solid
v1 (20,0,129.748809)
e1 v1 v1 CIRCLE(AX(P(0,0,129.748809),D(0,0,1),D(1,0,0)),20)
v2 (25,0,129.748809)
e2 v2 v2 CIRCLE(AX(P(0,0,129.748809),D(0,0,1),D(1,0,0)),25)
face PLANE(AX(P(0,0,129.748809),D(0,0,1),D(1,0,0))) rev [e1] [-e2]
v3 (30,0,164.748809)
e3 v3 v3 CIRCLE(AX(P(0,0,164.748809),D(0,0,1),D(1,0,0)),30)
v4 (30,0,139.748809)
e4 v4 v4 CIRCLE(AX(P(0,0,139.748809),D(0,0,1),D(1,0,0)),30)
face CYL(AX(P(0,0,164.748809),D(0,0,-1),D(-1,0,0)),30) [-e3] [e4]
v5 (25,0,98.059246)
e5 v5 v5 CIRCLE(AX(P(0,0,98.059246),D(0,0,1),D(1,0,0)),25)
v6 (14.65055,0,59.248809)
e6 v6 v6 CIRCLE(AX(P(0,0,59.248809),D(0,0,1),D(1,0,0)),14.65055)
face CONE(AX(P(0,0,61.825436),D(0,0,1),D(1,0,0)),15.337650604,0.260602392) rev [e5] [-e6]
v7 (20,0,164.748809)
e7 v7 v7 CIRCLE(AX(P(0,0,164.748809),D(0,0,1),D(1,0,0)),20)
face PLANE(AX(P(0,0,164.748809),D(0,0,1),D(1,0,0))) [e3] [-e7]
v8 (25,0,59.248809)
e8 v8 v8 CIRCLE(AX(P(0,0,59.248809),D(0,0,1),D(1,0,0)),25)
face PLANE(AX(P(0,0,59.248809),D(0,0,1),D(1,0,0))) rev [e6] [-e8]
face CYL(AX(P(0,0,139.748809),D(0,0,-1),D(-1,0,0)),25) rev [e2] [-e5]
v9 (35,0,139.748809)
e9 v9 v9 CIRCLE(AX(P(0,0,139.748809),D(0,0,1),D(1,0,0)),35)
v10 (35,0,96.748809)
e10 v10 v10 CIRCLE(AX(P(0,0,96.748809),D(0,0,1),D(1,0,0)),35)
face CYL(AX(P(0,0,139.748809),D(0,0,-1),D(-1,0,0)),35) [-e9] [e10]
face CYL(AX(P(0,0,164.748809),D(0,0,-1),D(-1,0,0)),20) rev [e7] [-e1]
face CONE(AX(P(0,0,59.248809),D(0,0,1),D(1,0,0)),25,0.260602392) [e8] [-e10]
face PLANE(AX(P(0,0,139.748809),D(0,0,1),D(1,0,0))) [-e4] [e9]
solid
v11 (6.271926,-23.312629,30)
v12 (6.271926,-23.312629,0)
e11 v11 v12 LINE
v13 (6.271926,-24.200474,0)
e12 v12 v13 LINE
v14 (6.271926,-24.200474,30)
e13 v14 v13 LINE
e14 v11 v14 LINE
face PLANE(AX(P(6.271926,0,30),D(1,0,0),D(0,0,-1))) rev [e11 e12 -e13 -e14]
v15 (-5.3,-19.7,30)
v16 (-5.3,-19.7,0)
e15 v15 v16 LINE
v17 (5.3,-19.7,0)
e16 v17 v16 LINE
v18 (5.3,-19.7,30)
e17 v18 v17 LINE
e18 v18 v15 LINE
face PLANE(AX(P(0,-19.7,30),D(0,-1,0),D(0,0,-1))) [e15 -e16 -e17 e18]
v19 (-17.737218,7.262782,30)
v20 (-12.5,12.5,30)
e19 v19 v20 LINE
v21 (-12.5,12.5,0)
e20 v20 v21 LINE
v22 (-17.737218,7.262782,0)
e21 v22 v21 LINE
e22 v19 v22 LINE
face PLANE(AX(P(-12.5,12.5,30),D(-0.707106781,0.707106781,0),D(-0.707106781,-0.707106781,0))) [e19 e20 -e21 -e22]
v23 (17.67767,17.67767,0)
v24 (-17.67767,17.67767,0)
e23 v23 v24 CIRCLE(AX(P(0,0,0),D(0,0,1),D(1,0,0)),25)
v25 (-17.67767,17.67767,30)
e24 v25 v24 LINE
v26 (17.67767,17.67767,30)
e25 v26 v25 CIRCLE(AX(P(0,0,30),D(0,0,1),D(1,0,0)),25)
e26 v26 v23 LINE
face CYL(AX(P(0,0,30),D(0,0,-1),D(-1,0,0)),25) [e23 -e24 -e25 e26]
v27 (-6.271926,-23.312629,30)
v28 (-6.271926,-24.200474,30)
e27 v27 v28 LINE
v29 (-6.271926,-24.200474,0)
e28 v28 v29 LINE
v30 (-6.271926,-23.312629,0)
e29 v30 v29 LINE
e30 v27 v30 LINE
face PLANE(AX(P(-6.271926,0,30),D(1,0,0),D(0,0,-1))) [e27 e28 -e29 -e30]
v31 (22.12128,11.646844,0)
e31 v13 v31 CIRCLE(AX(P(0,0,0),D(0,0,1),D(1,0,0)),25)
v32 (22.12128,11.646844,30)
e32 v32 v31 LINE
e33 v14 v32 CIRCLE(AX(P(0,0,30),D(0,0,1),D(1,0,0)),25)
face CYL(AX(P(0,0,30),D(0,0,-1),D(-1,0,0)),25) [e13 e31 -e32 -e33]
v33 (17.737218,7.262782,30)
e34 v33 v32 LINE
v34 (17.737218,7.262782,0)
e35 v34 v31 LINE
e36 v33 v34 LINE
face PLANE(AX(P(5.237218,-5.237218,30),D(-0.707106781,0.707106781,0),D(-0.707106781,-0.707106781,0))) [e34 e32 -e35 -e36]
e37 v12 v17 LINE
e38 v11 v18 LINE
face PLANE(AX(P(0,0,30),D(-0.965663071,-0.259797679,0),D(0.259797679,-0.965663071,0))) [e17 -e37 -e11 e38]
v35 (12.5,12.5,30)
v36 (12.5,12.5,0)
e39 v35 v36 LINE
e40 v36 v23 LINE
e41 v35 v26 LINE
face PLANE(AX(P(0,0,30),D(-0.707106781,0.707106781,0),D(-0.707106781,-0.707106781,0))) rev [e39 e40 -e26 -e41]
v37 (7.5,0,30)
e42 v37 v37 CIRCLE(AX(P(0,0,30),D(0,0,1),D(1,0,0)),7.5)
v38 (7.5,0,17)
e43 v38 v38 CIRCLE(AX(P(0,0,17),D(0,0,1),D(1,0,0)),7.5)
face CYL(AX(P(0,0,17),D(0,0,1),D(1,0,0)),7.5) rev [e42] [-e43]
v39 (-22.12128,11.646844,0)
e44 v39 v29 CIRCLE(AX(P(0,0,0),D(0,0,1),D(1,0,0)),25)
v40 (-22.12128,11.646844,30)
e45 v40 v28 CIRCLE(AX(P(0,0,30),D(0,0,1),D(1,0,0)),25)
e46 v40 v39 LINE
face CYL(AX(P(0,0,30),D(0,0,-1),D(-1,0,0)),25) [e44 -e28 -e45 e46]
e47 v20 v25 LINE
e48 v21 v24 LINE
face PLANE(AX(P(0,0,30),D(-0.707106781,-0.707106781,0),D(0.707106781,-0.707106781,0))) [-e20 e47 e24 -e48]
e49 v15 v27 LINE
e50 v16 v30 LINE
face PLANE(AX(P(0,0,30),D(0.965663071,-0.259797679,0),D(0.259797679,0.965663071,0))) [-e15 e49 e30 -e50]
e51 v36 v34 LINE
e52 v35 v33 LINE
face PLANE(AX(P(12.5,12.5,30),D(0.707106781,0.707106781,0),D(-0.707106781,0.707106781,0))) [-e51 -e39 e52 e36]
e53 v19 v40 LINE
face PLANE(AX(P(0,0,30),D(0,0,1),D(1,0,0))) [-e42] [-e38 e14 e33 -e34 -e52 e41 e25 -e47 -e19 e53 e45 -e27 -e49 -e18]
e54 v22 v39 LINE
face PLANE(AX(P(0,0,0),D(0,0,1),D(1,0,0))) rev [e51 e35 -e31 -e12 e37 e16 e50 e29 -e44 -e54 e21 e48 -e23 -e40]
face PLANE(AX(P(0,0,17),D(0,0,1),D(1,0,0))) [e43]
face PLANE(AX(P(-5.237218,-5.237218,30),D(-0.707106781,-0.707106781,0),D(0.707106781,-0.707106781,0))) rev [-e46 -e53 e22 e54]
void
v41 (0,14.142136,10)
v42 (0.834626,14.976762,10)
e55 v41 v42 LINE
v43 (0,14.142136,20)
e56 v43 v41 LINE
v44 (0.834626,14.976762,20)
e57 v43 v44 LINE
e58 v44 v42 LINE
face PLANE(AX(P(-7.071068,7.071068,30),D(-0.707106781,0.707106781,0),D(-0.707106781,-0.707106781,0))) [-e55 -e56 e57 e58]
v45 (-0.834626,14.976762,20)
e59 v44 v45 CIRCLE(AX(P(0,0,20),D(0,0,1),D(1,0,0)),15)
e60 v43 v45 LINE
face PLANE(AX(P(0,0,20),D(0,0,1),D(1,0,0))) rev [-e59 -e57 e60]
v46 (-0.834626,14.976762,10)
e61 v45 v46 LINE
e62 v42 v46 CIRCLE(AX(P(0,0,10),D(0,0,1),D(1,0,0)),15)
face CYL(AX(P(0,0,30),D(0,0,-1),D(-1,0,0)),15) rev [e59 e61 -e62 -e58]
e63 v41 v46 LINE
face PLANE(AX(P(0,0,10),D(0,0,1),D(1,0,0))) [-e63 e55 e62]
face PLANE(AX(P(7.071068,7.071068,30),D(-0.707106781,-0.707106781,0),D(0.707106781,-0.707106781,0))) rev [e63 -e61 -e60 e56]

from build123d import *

# Parameters (mm, degrees)
BOSS_EXTRUDE2_DEPTH = 30
SKETCH2_R           = 7.5
CUT_EXTRUDE1_DEPTH  = 13
SKETCH5_R           = 25
SKETCH7_R           = 35
SKETCH10_R          = 35
BOSS_EXTRUDE3_DEPTH = 43
SKETCH11_R          = 30
BOSS_EXTRUDE4_DEPTH = 25
SHELL4_T            = -10
SHELL5_START        = 10
SHELL5_DEPTH        = 10


# Read off the part's stored shape, not the designer's step: Shell5
with BuildPart() as part:
    # Sketch1 → Boss-Extrude2 (new body)
    with BuildSketch(Plane.XY):
        with BuildLine():
            Line((-17.67766953, 17.67766953), (-12.5, 12.5))
            Line((-12.5, 12.5), (-17.737217669, 7.262782331))
            Line((-17.737217669, 7.262782331), (-22.121279713, 11.646844374))
            ThreePointArc((-22.121279713, 11.646844374), (-22.864843942, -10.10934773), (-6.271925609, -24.200474151))
            Line((-6.271925609, -24.200474151), (-6.271925609, -23.312629151))
            Line((-6.271925609, -23.312629151), (-5.3, -19.7))
            Line((-5.3, -19.7), (0, -19.7))
            Line((0, -19.7), (5.3, -19.7))
            Line((5.3, -19.7), (6.271925609, -23.312629151))
            Line((6.271925609, -23.312629151), (6.271925609, -24.200474151))
            ThreePointArc((6.271925609, -24.200474151), (19.771167647, -15.300357182), (25, 0))
            ThreePointArc((25, 0), (24.269651757, 5.998666818), (22.121279713, 11.646844374))
            Line((22.121279713, 11.646844374), (17.737217669, 7.262782331))
            Line((17.737217669, 7.262782331), (12.5, 12.5))
            Line((12.5, 12.5), (17.67766953, 17.67766953))
            ThreePointArc((17.67766953, 17.67766953), (0, 25), (-17.67766953, 17.67766953))
        make_face()
    extrude(amount=BOSS_EXTRUDE2_DEPTH)

    # Sketch2 → Cut-Extrude1 (cut)
    with BuildSketch(Plane.XY.offset(30)):
        Circle(SKETCH2_R)
    extrude(amount=-CUT_EXTRUDE1_DEPTH, mode=Mode.SUBTRACT)

    # Shell5 outline → Shell5 (cut)
    with BuildSketch(Plane.XY.offset(SHELL5_START)):
        with BuildLine():
            Line((0, 14.142135624), (0.834626339, 14.976761962))
            ThreePointArc((0.834626339, 14.976761962), (0, 15), (-0.834626339, 14.976761962))
            Line((-0.834626339, 14.976761962), (0, 14.142135624))
        make_face()
    extrude(amount=SHELL5_DEPTH, mode=Mode.SUBTRACT)


with BuildPart() as body_2:
    # Sketch5 → Loft1 section 0
    with BuildSketch(Plane.XY.offset(59.248809309)):
        Circle(SKETCH5_R)
    # Sketch7 → Loft1 section 1
    with BuildSketch(Plane.XY.offset(96.748809309)):
        Circle(SKETCH7_R)
    loft()

    # Sketch10 → Boss-Extrude3 (add)
    with BuildSketch(Plane.XY.offset(96.748809309)):
        Circle(SKETCH10_R)
    extrude(amount=BOSS_EXTRUDE3_DEPTH)

    # Sketch11 → Boss-Extrude4 (add)
    with BuildSketch(Plane.XY.offset(139.748809309)):
        Circle(SKETCH11_R)
    extrude(amount=BOSS_EXTRUDE4_DEPTH)

    # Shell4
    shell4_openings = [body_2.faces().sort_by_distance(p)[0] for p in [
        (0, 0, 164.748809309),
        (0, 0, 59.248809309),
    ]]
    offset(amount=SHELL4_T, openings=shell4_openings, kind=Kind.INTERSECTION)


solid = Compound([part.part, body_2.part])
